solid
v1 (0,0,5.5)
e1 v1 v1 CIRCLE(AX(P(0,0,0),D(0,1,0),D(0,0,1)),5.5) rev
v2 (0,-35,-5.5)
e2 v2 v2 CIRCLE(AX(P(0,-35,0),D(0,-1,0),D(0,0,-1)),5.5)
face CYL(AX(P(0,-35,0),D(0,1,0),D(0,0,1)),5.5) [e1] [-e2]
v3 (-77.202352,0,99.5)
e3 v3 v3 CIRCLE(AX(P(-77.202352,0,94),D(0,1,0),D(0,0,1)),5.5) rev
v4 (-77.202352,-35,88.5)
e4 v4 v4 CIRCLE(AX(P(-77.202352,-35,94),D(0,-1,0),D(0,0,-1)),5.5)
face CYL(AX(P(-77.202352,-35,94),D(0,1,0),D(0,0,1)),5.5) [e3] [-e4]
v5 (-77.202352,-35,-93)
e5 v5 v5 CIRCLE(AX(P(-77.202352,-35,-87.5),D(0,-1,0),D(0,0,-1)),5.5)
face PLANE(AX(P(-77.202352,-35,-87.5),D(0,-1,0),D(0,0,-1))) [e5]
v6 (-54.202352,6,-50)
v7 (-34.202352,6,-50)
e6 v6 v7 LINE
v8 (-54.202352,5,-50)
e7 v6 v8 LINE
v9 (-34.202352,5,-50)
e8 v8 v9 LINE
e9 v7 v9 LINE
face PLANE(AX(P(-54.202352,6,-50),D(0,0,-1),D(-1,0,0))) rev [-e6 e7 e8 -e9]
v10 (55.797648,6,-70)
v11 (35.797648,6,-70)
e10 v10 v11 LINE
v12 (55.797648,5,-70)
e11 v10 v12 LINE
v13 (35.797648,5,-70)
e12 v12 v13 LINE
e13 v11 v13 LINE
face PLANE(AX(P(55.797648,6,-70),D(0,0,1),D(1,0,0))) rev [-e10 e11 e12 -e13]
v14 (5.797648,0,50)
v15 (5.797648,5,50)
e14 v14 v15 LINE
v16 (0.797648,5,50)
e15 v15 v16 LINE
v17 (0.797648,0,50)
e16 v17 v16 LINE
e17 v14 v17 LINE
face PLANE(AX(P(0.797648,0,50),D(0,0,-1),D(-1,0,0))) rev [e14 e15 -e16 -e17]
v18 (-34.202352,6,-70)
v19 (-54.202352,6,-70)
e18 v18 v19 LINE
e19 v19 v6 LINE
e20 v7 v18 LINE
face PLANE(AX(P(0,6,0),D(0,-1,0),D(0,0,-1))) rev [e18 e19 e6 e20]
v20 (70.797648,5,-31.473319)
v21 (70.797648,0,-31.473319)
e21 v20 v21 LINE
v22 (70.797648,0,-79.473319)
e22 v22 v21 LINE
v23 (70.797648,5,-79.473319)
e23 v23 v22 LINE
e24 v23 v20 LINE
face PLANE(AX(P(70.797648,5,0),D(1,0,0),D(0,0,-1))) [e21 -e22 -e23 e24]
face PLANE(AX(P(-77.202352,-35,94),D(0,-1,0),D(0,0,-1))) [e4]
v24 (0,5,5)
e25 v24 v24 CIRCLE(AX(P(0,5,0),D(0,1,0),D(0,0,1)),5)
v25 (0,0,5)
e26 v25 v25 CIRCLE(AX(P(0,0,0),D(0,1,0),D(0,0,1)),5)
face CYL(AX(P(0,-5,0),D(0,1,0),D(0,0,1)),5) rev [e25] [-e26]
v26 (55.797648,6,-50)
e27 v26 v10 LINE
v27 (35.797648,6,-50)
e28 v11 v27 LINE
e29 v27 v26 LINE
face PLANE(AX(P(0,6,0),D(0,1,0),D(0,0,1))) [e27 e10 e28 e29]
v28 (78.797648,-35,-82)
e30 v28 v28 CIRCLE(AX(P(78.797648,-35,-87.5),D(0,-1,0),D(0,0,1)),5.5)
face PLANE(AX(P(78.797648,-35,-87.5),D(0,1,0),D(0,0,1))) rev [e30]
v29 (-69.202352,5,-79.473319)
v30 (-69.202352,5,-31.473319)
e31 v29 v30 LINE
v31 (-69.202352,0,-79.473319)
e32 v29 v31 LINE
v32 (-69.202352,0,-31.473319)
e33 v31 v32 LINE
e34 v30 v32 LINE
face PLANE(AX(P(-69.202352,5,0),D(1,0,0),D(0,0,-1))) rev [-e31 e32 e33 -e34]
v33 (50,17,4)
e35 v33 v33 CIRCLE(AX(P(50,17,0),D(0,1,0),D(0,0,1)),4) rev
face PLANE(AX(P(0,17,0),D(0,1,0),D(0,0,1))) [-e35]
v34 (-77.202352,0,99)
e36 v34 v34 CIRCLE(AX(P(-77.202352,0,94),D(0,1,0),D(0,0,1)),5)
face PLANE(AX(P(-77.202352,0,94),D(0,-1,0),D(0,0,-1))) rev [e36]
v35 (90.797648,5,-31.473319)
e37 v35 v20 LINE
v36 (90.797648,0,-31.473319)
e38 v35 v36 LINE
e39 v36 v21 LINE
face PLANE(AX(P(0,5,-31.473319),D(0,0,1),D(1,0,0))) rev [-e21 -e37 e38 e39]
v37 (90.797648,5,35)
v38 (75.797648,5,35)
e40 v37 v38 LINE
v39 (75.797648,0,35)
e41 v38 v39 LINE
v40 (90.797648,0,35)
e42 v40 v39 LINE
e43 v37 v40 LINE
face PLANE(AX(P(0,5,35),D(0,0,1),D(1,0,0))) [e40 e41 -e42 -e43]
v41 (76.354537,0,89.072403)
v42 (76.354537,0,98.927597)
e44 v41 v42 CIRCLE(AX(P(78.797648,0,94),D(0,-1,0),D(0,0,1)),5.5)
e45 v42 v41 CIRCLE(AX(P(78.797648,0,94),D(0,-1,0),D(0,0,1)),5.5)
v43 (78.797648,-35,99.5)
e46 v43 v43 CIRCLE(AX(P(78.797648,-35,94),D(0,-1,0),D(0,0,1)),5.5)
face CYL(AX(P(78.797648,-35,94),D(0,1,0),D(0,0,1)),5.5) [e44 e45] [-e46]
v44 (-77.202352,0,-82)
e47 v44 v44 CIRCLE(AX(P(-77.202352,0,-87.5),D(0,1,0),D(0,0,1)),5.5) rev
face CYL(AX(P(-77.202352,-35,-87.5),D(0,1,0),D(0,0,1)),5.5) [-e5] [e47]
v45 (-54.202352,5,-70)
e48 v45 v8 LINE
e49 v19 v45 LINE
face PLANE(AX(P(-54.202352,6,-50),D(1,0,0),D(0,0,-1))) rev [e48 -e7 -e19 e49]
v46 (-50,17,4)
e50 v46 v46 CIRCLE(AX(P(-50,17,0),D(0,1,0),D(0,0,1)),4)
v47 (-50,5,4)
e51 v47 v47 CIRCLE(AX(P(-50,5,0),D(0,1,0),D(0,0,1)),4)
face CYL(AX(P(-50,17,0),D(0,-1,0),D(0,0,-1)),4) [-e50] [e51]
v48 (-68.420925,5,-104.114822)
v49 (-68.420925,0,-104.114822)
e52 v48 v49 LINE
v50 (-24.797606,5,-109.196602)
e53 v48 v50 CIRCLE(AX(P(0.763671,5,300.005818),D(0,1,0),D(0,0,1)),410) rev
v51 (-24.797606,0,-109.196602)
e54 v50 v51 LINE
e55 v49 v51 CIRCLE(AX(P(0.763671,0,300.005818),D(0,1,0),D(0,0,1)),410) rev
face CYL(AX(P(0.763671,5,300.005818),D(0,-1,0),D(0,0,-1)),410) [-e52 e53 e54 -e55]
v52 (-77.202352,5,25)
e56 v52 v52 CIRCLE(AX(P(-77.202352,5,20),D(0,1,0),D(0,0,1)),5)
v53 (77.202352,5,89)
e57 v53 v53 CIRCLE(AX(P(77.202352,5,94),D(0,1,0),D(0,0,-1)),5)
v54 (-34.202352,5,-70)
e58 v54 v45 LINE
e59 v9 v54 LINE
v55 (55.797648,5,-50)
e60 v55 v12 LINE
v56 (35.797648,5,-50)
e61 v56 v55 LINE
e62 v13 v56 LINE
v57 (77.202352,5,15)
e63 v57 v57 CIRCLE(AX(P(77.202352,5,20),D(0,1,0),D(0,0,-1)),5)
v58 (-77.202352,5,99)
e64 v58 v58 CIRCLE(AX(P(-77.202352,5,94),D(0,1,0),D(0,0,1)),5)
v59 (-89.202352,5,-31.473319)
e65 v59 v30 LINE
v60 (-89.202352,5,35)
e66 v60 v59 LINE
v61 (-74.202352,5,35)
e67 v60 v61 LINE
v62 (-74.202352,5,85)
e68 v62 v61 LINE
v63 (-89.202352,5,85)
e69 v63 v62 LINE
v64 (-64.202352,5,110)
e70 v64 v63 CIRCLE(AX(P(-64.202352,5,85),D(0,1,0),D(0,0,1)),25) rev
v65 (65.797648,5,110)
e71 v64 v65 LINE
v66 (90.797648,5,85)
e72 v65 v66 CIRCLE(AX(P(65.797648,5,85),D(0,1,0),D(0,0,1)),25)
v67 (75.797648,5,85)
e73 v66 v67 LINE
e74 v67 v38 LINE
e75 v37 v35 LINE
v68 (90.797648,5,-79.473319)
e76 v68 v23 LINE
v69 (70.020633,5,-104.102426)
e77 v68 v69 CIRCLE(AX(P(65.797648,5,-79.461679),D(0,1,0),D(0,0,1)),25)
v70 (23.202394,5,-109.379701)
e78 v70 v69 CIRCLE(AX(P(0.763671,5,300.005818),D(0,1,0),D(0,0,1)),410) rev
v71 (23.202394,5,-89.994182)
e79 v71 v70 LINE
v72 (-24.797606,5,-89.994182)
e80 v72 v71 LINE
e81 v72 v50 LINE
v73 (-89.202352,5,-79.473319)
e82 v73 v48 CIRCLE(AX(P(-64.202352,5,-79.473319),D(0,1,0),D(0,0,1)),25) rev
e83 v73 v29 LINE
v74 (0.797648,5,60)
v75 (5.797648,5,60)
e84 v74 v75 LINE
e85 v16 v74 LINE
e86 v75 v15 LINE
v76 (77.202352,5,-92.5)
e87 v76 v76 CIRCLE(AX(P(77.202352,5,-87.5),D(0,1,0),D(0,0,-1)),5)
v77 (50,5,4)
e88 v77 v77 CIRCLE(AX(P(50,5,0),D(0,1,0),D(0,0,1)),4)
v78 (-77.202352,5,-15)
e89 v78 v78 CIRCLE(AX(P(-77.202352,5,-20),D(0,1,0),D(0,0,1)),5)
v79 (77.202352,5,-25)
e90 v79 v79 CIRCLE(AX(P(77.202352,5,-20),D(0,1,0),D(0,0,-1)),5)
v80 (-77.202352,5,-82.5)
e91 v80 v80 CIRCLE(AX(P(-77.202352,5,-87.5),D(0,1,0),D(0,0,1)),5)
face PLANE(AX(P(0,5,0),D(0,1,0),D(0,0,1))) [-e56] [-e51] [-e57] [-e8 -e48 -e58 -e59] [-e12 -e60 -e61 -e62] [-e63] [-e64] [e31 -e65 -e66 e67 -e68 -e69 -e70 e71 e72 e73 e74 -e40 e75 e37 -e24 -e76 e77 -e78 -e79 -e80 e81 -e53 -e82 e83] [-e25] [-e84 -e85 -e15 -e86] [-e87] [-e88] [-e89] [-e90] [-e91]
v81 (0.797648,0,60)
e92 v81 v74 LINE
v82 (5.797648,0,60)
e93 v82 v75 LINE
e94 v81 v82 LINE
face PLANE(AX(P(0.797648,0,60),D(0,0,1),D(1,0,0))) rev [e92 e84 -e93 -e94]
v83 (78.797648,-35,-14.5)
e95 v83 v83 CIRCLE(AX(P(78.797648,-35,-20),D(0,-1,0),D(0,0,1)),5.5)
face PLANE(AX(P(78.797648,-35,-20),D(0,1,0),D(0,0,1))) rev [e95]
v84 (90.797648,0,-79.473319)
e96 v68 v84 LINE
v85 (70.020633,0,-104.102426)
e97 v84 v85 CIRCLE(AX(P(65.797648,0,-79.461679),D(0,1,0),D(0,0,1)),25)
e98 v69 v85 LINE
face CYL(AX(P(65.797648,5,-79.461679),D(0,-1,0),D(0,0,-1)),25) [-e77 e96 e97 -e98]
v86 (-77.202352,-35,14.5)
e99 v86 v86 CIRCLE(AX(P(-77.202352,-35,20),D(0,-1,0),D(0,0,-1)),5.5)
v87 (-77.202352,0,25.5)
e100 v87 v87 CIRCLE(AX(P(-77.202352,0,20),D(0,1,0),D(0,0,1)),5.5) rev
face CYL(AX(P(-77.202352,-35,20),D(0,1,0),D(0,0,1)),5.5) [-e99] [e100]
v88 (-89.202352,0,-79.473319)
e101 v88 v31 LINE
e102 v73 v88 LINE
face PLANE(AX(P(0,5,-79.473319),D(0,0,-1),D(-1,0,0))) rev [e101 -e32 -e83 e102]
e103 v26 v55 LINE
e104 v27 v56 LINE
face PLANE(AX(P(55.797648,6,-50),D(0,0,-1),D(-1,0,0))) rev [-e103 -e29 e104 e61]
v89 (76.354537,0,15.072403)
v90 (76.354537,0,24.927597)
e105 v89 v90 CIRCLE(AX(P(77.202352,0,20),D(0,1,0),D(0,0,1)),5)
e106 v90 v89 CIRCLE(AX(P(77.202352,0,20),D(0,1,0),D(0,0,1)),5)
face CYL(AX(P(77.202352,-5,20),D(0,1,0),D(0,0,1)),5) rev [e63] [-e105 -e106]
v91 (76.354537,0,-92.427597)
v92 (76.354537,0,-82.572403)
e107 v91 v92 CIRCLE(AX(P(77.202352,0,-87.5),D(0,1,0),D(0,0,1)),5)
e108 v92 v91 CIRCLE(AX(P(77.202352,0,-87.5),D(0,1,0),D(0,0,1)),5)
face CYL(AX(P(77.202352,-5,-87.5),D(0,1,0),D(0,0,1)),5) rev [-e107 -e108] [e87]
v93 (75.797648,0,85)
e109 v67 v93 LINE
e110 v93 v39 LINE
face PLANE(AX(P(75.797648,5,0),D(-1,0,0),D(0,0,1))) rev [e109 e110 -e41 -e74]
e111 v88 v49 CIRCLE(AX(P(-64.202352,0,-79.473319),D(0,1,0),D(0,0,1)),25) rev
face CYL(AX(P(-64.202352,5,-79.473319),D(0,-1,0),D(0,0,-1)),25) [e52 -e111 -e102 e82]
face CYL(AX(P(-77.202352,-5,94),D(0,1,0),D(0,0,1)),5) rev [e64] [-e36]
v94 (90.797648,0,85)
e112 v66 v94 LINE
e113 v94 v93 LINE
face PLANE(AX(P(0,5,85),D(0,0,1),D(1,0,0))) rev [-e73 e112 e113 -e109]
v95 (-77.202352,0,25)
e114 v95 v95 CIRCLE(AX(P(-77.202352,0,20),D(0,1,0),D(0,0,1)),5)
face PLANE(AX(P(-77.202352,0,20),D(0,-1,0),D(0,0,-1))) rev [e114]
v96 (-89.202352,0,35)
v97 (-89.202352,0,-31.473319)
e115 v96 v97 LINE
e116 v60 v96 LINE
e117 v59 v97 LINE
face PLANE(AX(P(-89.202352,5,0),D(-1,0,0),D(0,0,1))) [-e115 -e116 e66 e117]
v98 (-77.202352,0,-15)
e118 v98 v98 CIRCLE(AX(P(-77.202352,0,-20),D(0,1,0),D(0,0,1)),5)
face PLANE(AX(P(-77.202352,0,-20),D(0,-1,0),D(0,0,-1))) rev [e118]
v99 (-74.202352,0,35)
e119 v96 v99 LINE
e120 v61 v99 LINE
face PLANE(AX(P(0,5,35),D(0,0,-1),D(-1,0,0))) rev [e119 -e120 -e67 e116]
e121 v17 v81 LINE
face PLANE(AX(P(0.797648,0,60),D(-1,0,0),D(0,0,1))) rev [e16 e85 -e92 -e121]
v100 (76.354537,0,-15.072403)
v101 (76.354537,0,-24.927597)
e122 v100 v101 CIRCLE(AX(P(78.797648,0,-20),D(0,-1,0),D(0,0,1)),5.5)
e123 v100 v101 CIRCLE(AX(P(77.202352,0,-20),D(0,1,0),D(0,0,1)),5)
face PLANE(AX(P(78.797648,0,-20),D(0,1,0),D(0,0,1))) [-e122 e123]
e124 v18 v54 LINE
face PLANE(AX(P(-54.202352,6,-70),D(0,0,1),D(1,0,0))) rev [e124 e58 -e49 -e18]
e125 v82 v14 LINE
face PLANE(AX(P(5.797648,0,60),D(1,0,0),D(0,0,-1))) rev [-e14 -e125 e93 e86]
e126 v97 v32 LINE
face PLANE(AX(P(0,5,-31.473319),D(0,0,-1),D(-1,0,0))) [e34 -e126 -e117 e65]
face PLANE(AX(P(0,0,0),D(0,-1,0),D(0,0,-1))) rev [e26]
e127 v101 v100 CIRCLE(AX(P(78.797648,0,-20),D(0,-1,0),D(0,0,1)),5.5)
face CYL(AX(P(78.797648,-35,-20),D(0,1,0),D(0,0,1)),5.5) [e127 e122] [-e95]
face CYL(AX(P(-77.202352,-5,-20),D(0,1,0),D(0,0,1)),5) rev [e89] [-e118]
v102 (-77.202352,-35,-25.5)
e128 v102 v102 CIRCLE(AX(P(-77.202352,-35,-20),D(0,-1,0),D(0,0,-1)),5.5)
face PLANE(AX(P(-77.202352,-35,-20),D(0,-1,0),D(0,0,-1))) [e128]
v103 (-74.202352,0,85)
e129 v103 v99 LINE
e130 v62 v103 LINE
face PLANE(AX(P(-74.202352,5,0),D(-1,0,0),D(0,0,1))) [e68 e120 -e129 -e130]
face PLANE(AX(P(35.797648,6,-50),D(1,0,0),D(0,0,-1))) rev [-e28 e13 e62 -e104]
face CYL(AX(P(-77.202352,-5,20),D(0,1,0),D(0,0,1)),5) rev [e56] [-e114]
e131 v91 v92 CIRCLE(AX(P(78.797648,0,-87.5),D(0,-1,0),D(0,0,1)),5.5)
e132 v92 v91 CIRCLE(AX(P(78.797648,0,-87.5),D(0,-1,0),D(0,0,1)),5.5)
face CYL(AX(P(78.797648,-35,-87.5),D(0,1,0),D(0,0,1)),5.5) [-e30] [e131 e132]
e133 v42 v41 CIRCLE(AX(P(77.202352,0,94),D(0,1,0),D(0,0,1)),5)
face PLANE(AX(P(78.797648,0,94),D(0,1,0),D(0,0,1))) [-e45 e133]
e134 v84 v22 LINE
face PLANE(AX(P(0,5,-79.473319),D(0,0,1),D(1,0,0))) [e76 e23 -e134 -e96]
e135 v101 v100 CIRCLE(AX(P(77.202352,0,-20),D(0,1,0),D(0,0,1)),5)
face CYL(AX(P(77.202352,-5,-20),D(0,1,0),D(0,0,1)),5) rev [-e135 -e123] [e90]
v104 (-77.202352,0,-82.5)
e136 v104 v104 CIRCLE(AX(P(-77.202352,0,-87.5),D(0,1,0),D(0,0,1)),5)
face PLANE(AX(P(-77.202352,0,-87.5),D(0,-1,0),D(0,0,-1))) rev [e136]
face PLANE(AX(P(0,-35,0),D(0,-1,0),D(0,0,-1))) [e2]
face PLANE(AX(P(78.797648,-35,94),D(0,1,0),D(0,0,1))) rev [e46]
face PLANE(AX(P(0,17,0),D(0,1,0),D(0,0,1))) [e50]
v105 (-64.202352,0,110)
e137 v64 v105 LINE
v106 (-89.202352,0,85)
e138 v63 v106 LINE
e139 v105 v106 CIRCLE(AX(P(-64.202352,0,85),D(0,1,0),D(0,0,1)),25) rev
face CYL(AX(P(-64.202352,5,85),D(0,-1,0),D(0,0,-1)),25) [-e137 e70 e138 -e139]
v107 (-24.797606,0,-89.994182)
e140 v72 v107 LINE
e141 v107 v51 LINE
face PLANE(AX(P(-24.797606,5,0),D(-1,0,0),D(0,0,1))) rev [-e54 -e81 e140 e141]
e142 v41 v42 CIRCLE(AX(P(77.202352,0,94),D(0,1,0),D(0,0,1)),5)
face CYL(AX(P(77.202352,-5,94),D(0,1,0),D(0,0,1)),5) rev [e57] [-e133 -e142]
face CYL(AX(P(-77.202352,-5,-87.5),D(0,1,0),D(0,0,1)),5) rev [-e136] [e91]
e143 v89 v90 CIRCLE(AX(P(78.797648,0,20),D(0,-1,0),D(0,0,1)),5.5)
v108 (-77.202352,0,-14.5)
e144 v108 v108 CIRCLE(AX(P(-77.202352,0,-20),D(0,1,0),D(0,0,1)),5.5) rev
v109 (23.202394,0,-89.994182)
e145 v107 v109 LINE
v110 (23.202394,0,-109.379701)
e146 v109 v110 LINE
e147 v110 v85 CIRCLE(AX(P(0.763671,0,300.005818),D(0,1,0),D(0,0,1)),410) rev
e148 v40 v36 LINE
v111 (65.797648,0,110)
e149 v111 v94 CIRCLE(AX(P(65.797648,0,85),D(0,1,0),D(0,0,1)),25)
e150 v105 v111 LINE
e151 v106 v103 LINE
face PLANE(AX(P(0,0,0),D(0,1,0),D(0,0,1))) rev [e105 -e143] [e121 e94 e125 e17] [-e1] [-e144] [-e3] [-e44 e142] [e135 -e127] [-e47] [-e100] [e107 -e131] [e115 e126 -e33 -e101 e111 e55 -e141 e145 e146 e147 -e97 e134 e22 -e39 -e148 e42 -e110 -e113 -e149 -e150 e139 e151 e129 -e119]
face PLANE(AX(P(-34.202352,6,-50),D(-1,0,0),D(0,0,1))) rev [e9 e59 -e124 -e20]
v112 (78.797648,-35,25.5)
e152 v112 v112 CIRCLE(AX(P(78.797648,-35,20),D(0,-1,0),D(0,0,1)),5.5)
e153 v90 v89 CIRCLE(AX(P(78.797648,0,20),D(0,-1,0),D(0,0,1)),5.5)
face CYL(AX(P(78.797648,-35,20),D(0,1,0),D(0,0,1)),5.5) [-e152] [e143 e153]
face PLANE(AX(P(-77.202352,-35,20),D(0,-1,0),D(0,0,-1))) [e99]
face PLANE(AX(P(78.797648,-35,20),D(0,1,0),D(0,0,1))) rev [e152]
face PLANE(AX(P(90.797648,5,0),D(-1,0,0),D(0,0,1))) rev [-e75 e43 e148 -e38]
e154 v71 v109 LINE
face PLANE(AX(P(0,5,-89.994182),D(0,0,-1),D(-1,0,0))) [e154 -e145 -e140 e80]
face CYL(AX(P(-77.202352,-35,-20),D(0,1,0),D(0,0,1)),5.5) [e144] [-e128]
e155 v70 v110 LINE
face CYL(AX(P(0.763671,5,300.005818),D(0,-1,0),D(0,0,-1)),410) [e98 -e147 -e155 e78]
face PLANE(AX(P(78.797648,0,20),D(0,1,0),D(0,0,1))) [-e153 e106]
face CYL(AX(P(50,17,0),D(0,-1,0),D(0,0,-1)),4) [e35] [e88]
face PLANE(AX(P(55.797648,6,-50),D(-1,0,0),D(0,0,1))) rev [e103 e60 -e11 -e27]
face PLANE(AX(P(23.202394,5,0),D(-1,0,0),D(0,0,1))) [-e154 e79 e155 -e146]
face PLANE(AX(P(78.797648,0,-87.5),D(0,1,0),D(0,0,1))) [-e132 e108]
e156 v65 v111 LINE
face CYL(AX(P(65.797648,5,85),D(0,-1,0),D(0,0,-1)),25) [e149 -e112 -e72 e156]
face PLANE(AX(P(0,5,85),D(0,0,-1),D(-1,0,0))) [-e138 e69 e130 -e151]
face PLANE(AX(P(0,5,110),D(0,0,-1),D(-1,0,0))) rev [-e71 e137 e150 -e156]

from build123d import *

# Parameters (mm, degrees)
BOSS_EXTRUDE1_DEPTH = 5
SKETCH2_W           = 5
SKETCH2_H           = 10
CUT_EXTRUDE1_DEPTH  = 5
SKETCH3_W           = 20
SKETCH3_H           = 20
BOSS_EXTRUDE2_DEPTH = 1
SKETCH5_R           = 5
CUT_EXTRUDE2_DEPTH  = 10
SKETCH6_R           = 5.5
BOSS_EXTRUDE3_DEPTH = 35
SKETCH7_R           = 4
BOSS_EXTRUDE4_DEPTH = 12


# Read off the part's stored shape, not the designer's step: Boss-Extrude1
with BuildPart() as part:
    # Boss-Extrude1 outline → Boss-Extrude1 (new body)
    with BuildSketch(Plane(origin=(0, 0, 0), x_dir=(1, 0, 0), z_dir=(0, 1, 0))):
        with BuildLine():
            ThreePointArc((-68.420925207, 104.11482166), (-83.313400439, 95.590634086), (-89.202352286, 79.47331922))
            Line((-89.202352286, 79.47331922), (-69.202352286, 79.47331922))
            Line((-69.202352286, 79.47331922), (-69.202352286, 31.47331922))
            Line((-69.202352286, 31.47331922), (-89.202352286, 31.47331922))
            Line((-89.202352286, 31.47331922), (-89.202352286, -35))
            Line((-89.202352286, -35), (-74.202352286, -35))
            Line((-74.202352286, -35), (-74.202352286, -85))
            Line((-74.202352286, -85), (-89.202352286, -85))
            ThreePointArc((-89.202352286, -85), (-81.880021816, -102.67766953), (-64.202352286, -110))
            Line((-64.202352286, -110), (65.797647714, -110))
            ThreePointArc((65.797647714, -110), (83.475317244, -102.67766953), (90.797647714, -85))
            Line((90.797647714, -85), (75.797647714, -85))
            Line((75.797647714, -85), (75.797647714, -35))
            Line((75.797647714, -35), (90.797647714, -35))
            Line((90.797647714, -35), (90.797647714, 31.47331922))
            Line((90.797647714, 31.47331922), (70.797647714, 31.47331922))
            Line((70.797647714, 31.47331922), (70.797647714, 79.47331922))
            Line((70.797647714, 79.47331922), (90.797645004, 79.473319219))
            ThreePointArc((90.797645004, 79.473319219), (84.90638671, 95.581731914), (70.020633234, 104.102425978))
            ThreePointArc((70.020633234, 104.102425978), (46.687380596, 107.414128219), (23.202394477, 109.379701262))
            Line((23.202394477, 109.379701262), (23.202394477, 89.994181642))
            Line((23.202394477, 89.994181642), (-24.797605523, 89.994181642))
            Line((-24.797605523, 89.994181642), (-24.797605523, 109.196602404))
            ThreePointArc((-24.797605523, 109.196602404), (-46.677357907, 107.240236017), (-68.420925207, 104.11482166))
        make_face()
    extrude(amount=BOSS_EXTRUDE1_DEPTH)

    # Sketch2 → Cut-Extrude1 (cut)
    with BuildSketch(Plane(origin=(0, 5, 0), x_dir=(1, 0, 0), z_dir=(0, 1, 0))):
        with Locations((3.297647714, -55)):
            Rectangle(SKETCH2_W, SKETCH2_H)
    extrude(amount=-CUT_EXTRUDE1_DEPTH, mode=Mode.SUBTRACT)

    # Sketch3 → Boss-Extrude2 (add)
    with BuildSketch(Plane(origin=(0, 5, 0), x_dir=(1, 0, 0), z_dir=(0, 1, 0))):
        with Locations((45.797647714, 60)):
            Rectangle(SKETCH3_W, SKETCH3_H)
        with Locations((-44.202352286, 60)):
            Rectangle(SKETCH3_W, SKETCH3_H)
    extrude(amount=BOSS_EXTRUDE2_DEPTH)

    # Sketch5 → Cut-Extrude2 (cut)
    with BuildSketch(Plane(origin=(0, 5, 0), x_dir=(1, 0, 0), z_dir=(0, 1, 0))):
        with Locations(Location((-77.202352286, 20, 0), (0, 0, 270))):
            Circle(SKETCH5_R)
        with Locations(Location((-77.202352286, -20, 0), (0, 0, 270))):
            Circle(SKETCH5_R)
        with Locations(Location((-77.202352286, 87.5, 0), (0, 0, 270))):
            Circle(SKETCH5_R)
        with Locations(Location((-77.202352286, -94, 0), (0, 0, 270))):
            Circle(SKETCH5_R)
        with Locations(Location((0, 0, 0), (0, 0, 270))):
            Circle(SKETCH5_R)
        with Locations(Location((77.202352286, -94, 0), (0, 0, 270))):
            Circle(SKETCH5_R)
        with Locations(Location((77.202352286, -20, 0), (0, 0, 270))):
            Circle(SKETCH5_R)
        with Locations(Location((77.202352286, 20, 0), (0, 0, 270))):
            Circle(SKETCH5_R)
        with Locations(Location((77.202352286, 87.5, 0), (0, 0, 270))):
            Circle(SKETCH5_R)
    extrude(amount=-CUT_EXTRUDE2_DEPTH, mode=Mode.SUBTRACT)

    # Sketch6 → Boss-Extrude3 (add)
    with BuildSketch(Plane.XZ):
        with Locations(Location((-77.202352286, 94, 0), (0, 0, 90))):
            Circle(SKETCH6_R)
        with Locations(Location((-77.202352286, 20, 0), (0, 0, 90))):
            Circle(SKETCH6_R)
        with Locations(Location((-77.202352286, -20, 0), (0, 0, 90))):
            Circle(SKETCH6_R)
        with Locations(Location((-77.202352286, -87.5, 0), (0, 0, 90))):
            Circle(SKETCH6_R)
        with Locations(Location((0, 0, 0), (0, 0, 90))):
            Circle(SKETCH6_R)
        with Locations(Location((78.797647714, -87.5, 0), (0, 0, 90))):
            Circle(SKETCH6_R)
        with Locations(Location((78.797647714, -20, 0), (0, 0, 90))):
            Circle(SKETCH6_R)
        with Locations(Location((78.797647714, 20, 0), (0, 0, 90))):
            Circle(SKETCH6_R)
        with Locations(Location((78.797647714, 94, 0), (0, 0, 90))):
            Circle(SKETCH6_R)
    extrude(amount=BOSS_EXTRUDE3_DEPTH)

    # Sketch7 → Boss-Extrude4 (add)
    with BuildSketch(Plane(origin=(0, 5, 0), x_dir=(1, 0, 0), z_dir=(0, 1, 0))):
        with Locations(Location((-50, 0, 0), (0, 0, 270))):
            Circle(SKETCH7_R)
        with Locations(Location((50, 0, 0), (0, 0, 270))):
            Circle(SKETCH7_R)
    extrude(amount=BOSS_EXTRUDE4_DEPTH)


solid = part.part
